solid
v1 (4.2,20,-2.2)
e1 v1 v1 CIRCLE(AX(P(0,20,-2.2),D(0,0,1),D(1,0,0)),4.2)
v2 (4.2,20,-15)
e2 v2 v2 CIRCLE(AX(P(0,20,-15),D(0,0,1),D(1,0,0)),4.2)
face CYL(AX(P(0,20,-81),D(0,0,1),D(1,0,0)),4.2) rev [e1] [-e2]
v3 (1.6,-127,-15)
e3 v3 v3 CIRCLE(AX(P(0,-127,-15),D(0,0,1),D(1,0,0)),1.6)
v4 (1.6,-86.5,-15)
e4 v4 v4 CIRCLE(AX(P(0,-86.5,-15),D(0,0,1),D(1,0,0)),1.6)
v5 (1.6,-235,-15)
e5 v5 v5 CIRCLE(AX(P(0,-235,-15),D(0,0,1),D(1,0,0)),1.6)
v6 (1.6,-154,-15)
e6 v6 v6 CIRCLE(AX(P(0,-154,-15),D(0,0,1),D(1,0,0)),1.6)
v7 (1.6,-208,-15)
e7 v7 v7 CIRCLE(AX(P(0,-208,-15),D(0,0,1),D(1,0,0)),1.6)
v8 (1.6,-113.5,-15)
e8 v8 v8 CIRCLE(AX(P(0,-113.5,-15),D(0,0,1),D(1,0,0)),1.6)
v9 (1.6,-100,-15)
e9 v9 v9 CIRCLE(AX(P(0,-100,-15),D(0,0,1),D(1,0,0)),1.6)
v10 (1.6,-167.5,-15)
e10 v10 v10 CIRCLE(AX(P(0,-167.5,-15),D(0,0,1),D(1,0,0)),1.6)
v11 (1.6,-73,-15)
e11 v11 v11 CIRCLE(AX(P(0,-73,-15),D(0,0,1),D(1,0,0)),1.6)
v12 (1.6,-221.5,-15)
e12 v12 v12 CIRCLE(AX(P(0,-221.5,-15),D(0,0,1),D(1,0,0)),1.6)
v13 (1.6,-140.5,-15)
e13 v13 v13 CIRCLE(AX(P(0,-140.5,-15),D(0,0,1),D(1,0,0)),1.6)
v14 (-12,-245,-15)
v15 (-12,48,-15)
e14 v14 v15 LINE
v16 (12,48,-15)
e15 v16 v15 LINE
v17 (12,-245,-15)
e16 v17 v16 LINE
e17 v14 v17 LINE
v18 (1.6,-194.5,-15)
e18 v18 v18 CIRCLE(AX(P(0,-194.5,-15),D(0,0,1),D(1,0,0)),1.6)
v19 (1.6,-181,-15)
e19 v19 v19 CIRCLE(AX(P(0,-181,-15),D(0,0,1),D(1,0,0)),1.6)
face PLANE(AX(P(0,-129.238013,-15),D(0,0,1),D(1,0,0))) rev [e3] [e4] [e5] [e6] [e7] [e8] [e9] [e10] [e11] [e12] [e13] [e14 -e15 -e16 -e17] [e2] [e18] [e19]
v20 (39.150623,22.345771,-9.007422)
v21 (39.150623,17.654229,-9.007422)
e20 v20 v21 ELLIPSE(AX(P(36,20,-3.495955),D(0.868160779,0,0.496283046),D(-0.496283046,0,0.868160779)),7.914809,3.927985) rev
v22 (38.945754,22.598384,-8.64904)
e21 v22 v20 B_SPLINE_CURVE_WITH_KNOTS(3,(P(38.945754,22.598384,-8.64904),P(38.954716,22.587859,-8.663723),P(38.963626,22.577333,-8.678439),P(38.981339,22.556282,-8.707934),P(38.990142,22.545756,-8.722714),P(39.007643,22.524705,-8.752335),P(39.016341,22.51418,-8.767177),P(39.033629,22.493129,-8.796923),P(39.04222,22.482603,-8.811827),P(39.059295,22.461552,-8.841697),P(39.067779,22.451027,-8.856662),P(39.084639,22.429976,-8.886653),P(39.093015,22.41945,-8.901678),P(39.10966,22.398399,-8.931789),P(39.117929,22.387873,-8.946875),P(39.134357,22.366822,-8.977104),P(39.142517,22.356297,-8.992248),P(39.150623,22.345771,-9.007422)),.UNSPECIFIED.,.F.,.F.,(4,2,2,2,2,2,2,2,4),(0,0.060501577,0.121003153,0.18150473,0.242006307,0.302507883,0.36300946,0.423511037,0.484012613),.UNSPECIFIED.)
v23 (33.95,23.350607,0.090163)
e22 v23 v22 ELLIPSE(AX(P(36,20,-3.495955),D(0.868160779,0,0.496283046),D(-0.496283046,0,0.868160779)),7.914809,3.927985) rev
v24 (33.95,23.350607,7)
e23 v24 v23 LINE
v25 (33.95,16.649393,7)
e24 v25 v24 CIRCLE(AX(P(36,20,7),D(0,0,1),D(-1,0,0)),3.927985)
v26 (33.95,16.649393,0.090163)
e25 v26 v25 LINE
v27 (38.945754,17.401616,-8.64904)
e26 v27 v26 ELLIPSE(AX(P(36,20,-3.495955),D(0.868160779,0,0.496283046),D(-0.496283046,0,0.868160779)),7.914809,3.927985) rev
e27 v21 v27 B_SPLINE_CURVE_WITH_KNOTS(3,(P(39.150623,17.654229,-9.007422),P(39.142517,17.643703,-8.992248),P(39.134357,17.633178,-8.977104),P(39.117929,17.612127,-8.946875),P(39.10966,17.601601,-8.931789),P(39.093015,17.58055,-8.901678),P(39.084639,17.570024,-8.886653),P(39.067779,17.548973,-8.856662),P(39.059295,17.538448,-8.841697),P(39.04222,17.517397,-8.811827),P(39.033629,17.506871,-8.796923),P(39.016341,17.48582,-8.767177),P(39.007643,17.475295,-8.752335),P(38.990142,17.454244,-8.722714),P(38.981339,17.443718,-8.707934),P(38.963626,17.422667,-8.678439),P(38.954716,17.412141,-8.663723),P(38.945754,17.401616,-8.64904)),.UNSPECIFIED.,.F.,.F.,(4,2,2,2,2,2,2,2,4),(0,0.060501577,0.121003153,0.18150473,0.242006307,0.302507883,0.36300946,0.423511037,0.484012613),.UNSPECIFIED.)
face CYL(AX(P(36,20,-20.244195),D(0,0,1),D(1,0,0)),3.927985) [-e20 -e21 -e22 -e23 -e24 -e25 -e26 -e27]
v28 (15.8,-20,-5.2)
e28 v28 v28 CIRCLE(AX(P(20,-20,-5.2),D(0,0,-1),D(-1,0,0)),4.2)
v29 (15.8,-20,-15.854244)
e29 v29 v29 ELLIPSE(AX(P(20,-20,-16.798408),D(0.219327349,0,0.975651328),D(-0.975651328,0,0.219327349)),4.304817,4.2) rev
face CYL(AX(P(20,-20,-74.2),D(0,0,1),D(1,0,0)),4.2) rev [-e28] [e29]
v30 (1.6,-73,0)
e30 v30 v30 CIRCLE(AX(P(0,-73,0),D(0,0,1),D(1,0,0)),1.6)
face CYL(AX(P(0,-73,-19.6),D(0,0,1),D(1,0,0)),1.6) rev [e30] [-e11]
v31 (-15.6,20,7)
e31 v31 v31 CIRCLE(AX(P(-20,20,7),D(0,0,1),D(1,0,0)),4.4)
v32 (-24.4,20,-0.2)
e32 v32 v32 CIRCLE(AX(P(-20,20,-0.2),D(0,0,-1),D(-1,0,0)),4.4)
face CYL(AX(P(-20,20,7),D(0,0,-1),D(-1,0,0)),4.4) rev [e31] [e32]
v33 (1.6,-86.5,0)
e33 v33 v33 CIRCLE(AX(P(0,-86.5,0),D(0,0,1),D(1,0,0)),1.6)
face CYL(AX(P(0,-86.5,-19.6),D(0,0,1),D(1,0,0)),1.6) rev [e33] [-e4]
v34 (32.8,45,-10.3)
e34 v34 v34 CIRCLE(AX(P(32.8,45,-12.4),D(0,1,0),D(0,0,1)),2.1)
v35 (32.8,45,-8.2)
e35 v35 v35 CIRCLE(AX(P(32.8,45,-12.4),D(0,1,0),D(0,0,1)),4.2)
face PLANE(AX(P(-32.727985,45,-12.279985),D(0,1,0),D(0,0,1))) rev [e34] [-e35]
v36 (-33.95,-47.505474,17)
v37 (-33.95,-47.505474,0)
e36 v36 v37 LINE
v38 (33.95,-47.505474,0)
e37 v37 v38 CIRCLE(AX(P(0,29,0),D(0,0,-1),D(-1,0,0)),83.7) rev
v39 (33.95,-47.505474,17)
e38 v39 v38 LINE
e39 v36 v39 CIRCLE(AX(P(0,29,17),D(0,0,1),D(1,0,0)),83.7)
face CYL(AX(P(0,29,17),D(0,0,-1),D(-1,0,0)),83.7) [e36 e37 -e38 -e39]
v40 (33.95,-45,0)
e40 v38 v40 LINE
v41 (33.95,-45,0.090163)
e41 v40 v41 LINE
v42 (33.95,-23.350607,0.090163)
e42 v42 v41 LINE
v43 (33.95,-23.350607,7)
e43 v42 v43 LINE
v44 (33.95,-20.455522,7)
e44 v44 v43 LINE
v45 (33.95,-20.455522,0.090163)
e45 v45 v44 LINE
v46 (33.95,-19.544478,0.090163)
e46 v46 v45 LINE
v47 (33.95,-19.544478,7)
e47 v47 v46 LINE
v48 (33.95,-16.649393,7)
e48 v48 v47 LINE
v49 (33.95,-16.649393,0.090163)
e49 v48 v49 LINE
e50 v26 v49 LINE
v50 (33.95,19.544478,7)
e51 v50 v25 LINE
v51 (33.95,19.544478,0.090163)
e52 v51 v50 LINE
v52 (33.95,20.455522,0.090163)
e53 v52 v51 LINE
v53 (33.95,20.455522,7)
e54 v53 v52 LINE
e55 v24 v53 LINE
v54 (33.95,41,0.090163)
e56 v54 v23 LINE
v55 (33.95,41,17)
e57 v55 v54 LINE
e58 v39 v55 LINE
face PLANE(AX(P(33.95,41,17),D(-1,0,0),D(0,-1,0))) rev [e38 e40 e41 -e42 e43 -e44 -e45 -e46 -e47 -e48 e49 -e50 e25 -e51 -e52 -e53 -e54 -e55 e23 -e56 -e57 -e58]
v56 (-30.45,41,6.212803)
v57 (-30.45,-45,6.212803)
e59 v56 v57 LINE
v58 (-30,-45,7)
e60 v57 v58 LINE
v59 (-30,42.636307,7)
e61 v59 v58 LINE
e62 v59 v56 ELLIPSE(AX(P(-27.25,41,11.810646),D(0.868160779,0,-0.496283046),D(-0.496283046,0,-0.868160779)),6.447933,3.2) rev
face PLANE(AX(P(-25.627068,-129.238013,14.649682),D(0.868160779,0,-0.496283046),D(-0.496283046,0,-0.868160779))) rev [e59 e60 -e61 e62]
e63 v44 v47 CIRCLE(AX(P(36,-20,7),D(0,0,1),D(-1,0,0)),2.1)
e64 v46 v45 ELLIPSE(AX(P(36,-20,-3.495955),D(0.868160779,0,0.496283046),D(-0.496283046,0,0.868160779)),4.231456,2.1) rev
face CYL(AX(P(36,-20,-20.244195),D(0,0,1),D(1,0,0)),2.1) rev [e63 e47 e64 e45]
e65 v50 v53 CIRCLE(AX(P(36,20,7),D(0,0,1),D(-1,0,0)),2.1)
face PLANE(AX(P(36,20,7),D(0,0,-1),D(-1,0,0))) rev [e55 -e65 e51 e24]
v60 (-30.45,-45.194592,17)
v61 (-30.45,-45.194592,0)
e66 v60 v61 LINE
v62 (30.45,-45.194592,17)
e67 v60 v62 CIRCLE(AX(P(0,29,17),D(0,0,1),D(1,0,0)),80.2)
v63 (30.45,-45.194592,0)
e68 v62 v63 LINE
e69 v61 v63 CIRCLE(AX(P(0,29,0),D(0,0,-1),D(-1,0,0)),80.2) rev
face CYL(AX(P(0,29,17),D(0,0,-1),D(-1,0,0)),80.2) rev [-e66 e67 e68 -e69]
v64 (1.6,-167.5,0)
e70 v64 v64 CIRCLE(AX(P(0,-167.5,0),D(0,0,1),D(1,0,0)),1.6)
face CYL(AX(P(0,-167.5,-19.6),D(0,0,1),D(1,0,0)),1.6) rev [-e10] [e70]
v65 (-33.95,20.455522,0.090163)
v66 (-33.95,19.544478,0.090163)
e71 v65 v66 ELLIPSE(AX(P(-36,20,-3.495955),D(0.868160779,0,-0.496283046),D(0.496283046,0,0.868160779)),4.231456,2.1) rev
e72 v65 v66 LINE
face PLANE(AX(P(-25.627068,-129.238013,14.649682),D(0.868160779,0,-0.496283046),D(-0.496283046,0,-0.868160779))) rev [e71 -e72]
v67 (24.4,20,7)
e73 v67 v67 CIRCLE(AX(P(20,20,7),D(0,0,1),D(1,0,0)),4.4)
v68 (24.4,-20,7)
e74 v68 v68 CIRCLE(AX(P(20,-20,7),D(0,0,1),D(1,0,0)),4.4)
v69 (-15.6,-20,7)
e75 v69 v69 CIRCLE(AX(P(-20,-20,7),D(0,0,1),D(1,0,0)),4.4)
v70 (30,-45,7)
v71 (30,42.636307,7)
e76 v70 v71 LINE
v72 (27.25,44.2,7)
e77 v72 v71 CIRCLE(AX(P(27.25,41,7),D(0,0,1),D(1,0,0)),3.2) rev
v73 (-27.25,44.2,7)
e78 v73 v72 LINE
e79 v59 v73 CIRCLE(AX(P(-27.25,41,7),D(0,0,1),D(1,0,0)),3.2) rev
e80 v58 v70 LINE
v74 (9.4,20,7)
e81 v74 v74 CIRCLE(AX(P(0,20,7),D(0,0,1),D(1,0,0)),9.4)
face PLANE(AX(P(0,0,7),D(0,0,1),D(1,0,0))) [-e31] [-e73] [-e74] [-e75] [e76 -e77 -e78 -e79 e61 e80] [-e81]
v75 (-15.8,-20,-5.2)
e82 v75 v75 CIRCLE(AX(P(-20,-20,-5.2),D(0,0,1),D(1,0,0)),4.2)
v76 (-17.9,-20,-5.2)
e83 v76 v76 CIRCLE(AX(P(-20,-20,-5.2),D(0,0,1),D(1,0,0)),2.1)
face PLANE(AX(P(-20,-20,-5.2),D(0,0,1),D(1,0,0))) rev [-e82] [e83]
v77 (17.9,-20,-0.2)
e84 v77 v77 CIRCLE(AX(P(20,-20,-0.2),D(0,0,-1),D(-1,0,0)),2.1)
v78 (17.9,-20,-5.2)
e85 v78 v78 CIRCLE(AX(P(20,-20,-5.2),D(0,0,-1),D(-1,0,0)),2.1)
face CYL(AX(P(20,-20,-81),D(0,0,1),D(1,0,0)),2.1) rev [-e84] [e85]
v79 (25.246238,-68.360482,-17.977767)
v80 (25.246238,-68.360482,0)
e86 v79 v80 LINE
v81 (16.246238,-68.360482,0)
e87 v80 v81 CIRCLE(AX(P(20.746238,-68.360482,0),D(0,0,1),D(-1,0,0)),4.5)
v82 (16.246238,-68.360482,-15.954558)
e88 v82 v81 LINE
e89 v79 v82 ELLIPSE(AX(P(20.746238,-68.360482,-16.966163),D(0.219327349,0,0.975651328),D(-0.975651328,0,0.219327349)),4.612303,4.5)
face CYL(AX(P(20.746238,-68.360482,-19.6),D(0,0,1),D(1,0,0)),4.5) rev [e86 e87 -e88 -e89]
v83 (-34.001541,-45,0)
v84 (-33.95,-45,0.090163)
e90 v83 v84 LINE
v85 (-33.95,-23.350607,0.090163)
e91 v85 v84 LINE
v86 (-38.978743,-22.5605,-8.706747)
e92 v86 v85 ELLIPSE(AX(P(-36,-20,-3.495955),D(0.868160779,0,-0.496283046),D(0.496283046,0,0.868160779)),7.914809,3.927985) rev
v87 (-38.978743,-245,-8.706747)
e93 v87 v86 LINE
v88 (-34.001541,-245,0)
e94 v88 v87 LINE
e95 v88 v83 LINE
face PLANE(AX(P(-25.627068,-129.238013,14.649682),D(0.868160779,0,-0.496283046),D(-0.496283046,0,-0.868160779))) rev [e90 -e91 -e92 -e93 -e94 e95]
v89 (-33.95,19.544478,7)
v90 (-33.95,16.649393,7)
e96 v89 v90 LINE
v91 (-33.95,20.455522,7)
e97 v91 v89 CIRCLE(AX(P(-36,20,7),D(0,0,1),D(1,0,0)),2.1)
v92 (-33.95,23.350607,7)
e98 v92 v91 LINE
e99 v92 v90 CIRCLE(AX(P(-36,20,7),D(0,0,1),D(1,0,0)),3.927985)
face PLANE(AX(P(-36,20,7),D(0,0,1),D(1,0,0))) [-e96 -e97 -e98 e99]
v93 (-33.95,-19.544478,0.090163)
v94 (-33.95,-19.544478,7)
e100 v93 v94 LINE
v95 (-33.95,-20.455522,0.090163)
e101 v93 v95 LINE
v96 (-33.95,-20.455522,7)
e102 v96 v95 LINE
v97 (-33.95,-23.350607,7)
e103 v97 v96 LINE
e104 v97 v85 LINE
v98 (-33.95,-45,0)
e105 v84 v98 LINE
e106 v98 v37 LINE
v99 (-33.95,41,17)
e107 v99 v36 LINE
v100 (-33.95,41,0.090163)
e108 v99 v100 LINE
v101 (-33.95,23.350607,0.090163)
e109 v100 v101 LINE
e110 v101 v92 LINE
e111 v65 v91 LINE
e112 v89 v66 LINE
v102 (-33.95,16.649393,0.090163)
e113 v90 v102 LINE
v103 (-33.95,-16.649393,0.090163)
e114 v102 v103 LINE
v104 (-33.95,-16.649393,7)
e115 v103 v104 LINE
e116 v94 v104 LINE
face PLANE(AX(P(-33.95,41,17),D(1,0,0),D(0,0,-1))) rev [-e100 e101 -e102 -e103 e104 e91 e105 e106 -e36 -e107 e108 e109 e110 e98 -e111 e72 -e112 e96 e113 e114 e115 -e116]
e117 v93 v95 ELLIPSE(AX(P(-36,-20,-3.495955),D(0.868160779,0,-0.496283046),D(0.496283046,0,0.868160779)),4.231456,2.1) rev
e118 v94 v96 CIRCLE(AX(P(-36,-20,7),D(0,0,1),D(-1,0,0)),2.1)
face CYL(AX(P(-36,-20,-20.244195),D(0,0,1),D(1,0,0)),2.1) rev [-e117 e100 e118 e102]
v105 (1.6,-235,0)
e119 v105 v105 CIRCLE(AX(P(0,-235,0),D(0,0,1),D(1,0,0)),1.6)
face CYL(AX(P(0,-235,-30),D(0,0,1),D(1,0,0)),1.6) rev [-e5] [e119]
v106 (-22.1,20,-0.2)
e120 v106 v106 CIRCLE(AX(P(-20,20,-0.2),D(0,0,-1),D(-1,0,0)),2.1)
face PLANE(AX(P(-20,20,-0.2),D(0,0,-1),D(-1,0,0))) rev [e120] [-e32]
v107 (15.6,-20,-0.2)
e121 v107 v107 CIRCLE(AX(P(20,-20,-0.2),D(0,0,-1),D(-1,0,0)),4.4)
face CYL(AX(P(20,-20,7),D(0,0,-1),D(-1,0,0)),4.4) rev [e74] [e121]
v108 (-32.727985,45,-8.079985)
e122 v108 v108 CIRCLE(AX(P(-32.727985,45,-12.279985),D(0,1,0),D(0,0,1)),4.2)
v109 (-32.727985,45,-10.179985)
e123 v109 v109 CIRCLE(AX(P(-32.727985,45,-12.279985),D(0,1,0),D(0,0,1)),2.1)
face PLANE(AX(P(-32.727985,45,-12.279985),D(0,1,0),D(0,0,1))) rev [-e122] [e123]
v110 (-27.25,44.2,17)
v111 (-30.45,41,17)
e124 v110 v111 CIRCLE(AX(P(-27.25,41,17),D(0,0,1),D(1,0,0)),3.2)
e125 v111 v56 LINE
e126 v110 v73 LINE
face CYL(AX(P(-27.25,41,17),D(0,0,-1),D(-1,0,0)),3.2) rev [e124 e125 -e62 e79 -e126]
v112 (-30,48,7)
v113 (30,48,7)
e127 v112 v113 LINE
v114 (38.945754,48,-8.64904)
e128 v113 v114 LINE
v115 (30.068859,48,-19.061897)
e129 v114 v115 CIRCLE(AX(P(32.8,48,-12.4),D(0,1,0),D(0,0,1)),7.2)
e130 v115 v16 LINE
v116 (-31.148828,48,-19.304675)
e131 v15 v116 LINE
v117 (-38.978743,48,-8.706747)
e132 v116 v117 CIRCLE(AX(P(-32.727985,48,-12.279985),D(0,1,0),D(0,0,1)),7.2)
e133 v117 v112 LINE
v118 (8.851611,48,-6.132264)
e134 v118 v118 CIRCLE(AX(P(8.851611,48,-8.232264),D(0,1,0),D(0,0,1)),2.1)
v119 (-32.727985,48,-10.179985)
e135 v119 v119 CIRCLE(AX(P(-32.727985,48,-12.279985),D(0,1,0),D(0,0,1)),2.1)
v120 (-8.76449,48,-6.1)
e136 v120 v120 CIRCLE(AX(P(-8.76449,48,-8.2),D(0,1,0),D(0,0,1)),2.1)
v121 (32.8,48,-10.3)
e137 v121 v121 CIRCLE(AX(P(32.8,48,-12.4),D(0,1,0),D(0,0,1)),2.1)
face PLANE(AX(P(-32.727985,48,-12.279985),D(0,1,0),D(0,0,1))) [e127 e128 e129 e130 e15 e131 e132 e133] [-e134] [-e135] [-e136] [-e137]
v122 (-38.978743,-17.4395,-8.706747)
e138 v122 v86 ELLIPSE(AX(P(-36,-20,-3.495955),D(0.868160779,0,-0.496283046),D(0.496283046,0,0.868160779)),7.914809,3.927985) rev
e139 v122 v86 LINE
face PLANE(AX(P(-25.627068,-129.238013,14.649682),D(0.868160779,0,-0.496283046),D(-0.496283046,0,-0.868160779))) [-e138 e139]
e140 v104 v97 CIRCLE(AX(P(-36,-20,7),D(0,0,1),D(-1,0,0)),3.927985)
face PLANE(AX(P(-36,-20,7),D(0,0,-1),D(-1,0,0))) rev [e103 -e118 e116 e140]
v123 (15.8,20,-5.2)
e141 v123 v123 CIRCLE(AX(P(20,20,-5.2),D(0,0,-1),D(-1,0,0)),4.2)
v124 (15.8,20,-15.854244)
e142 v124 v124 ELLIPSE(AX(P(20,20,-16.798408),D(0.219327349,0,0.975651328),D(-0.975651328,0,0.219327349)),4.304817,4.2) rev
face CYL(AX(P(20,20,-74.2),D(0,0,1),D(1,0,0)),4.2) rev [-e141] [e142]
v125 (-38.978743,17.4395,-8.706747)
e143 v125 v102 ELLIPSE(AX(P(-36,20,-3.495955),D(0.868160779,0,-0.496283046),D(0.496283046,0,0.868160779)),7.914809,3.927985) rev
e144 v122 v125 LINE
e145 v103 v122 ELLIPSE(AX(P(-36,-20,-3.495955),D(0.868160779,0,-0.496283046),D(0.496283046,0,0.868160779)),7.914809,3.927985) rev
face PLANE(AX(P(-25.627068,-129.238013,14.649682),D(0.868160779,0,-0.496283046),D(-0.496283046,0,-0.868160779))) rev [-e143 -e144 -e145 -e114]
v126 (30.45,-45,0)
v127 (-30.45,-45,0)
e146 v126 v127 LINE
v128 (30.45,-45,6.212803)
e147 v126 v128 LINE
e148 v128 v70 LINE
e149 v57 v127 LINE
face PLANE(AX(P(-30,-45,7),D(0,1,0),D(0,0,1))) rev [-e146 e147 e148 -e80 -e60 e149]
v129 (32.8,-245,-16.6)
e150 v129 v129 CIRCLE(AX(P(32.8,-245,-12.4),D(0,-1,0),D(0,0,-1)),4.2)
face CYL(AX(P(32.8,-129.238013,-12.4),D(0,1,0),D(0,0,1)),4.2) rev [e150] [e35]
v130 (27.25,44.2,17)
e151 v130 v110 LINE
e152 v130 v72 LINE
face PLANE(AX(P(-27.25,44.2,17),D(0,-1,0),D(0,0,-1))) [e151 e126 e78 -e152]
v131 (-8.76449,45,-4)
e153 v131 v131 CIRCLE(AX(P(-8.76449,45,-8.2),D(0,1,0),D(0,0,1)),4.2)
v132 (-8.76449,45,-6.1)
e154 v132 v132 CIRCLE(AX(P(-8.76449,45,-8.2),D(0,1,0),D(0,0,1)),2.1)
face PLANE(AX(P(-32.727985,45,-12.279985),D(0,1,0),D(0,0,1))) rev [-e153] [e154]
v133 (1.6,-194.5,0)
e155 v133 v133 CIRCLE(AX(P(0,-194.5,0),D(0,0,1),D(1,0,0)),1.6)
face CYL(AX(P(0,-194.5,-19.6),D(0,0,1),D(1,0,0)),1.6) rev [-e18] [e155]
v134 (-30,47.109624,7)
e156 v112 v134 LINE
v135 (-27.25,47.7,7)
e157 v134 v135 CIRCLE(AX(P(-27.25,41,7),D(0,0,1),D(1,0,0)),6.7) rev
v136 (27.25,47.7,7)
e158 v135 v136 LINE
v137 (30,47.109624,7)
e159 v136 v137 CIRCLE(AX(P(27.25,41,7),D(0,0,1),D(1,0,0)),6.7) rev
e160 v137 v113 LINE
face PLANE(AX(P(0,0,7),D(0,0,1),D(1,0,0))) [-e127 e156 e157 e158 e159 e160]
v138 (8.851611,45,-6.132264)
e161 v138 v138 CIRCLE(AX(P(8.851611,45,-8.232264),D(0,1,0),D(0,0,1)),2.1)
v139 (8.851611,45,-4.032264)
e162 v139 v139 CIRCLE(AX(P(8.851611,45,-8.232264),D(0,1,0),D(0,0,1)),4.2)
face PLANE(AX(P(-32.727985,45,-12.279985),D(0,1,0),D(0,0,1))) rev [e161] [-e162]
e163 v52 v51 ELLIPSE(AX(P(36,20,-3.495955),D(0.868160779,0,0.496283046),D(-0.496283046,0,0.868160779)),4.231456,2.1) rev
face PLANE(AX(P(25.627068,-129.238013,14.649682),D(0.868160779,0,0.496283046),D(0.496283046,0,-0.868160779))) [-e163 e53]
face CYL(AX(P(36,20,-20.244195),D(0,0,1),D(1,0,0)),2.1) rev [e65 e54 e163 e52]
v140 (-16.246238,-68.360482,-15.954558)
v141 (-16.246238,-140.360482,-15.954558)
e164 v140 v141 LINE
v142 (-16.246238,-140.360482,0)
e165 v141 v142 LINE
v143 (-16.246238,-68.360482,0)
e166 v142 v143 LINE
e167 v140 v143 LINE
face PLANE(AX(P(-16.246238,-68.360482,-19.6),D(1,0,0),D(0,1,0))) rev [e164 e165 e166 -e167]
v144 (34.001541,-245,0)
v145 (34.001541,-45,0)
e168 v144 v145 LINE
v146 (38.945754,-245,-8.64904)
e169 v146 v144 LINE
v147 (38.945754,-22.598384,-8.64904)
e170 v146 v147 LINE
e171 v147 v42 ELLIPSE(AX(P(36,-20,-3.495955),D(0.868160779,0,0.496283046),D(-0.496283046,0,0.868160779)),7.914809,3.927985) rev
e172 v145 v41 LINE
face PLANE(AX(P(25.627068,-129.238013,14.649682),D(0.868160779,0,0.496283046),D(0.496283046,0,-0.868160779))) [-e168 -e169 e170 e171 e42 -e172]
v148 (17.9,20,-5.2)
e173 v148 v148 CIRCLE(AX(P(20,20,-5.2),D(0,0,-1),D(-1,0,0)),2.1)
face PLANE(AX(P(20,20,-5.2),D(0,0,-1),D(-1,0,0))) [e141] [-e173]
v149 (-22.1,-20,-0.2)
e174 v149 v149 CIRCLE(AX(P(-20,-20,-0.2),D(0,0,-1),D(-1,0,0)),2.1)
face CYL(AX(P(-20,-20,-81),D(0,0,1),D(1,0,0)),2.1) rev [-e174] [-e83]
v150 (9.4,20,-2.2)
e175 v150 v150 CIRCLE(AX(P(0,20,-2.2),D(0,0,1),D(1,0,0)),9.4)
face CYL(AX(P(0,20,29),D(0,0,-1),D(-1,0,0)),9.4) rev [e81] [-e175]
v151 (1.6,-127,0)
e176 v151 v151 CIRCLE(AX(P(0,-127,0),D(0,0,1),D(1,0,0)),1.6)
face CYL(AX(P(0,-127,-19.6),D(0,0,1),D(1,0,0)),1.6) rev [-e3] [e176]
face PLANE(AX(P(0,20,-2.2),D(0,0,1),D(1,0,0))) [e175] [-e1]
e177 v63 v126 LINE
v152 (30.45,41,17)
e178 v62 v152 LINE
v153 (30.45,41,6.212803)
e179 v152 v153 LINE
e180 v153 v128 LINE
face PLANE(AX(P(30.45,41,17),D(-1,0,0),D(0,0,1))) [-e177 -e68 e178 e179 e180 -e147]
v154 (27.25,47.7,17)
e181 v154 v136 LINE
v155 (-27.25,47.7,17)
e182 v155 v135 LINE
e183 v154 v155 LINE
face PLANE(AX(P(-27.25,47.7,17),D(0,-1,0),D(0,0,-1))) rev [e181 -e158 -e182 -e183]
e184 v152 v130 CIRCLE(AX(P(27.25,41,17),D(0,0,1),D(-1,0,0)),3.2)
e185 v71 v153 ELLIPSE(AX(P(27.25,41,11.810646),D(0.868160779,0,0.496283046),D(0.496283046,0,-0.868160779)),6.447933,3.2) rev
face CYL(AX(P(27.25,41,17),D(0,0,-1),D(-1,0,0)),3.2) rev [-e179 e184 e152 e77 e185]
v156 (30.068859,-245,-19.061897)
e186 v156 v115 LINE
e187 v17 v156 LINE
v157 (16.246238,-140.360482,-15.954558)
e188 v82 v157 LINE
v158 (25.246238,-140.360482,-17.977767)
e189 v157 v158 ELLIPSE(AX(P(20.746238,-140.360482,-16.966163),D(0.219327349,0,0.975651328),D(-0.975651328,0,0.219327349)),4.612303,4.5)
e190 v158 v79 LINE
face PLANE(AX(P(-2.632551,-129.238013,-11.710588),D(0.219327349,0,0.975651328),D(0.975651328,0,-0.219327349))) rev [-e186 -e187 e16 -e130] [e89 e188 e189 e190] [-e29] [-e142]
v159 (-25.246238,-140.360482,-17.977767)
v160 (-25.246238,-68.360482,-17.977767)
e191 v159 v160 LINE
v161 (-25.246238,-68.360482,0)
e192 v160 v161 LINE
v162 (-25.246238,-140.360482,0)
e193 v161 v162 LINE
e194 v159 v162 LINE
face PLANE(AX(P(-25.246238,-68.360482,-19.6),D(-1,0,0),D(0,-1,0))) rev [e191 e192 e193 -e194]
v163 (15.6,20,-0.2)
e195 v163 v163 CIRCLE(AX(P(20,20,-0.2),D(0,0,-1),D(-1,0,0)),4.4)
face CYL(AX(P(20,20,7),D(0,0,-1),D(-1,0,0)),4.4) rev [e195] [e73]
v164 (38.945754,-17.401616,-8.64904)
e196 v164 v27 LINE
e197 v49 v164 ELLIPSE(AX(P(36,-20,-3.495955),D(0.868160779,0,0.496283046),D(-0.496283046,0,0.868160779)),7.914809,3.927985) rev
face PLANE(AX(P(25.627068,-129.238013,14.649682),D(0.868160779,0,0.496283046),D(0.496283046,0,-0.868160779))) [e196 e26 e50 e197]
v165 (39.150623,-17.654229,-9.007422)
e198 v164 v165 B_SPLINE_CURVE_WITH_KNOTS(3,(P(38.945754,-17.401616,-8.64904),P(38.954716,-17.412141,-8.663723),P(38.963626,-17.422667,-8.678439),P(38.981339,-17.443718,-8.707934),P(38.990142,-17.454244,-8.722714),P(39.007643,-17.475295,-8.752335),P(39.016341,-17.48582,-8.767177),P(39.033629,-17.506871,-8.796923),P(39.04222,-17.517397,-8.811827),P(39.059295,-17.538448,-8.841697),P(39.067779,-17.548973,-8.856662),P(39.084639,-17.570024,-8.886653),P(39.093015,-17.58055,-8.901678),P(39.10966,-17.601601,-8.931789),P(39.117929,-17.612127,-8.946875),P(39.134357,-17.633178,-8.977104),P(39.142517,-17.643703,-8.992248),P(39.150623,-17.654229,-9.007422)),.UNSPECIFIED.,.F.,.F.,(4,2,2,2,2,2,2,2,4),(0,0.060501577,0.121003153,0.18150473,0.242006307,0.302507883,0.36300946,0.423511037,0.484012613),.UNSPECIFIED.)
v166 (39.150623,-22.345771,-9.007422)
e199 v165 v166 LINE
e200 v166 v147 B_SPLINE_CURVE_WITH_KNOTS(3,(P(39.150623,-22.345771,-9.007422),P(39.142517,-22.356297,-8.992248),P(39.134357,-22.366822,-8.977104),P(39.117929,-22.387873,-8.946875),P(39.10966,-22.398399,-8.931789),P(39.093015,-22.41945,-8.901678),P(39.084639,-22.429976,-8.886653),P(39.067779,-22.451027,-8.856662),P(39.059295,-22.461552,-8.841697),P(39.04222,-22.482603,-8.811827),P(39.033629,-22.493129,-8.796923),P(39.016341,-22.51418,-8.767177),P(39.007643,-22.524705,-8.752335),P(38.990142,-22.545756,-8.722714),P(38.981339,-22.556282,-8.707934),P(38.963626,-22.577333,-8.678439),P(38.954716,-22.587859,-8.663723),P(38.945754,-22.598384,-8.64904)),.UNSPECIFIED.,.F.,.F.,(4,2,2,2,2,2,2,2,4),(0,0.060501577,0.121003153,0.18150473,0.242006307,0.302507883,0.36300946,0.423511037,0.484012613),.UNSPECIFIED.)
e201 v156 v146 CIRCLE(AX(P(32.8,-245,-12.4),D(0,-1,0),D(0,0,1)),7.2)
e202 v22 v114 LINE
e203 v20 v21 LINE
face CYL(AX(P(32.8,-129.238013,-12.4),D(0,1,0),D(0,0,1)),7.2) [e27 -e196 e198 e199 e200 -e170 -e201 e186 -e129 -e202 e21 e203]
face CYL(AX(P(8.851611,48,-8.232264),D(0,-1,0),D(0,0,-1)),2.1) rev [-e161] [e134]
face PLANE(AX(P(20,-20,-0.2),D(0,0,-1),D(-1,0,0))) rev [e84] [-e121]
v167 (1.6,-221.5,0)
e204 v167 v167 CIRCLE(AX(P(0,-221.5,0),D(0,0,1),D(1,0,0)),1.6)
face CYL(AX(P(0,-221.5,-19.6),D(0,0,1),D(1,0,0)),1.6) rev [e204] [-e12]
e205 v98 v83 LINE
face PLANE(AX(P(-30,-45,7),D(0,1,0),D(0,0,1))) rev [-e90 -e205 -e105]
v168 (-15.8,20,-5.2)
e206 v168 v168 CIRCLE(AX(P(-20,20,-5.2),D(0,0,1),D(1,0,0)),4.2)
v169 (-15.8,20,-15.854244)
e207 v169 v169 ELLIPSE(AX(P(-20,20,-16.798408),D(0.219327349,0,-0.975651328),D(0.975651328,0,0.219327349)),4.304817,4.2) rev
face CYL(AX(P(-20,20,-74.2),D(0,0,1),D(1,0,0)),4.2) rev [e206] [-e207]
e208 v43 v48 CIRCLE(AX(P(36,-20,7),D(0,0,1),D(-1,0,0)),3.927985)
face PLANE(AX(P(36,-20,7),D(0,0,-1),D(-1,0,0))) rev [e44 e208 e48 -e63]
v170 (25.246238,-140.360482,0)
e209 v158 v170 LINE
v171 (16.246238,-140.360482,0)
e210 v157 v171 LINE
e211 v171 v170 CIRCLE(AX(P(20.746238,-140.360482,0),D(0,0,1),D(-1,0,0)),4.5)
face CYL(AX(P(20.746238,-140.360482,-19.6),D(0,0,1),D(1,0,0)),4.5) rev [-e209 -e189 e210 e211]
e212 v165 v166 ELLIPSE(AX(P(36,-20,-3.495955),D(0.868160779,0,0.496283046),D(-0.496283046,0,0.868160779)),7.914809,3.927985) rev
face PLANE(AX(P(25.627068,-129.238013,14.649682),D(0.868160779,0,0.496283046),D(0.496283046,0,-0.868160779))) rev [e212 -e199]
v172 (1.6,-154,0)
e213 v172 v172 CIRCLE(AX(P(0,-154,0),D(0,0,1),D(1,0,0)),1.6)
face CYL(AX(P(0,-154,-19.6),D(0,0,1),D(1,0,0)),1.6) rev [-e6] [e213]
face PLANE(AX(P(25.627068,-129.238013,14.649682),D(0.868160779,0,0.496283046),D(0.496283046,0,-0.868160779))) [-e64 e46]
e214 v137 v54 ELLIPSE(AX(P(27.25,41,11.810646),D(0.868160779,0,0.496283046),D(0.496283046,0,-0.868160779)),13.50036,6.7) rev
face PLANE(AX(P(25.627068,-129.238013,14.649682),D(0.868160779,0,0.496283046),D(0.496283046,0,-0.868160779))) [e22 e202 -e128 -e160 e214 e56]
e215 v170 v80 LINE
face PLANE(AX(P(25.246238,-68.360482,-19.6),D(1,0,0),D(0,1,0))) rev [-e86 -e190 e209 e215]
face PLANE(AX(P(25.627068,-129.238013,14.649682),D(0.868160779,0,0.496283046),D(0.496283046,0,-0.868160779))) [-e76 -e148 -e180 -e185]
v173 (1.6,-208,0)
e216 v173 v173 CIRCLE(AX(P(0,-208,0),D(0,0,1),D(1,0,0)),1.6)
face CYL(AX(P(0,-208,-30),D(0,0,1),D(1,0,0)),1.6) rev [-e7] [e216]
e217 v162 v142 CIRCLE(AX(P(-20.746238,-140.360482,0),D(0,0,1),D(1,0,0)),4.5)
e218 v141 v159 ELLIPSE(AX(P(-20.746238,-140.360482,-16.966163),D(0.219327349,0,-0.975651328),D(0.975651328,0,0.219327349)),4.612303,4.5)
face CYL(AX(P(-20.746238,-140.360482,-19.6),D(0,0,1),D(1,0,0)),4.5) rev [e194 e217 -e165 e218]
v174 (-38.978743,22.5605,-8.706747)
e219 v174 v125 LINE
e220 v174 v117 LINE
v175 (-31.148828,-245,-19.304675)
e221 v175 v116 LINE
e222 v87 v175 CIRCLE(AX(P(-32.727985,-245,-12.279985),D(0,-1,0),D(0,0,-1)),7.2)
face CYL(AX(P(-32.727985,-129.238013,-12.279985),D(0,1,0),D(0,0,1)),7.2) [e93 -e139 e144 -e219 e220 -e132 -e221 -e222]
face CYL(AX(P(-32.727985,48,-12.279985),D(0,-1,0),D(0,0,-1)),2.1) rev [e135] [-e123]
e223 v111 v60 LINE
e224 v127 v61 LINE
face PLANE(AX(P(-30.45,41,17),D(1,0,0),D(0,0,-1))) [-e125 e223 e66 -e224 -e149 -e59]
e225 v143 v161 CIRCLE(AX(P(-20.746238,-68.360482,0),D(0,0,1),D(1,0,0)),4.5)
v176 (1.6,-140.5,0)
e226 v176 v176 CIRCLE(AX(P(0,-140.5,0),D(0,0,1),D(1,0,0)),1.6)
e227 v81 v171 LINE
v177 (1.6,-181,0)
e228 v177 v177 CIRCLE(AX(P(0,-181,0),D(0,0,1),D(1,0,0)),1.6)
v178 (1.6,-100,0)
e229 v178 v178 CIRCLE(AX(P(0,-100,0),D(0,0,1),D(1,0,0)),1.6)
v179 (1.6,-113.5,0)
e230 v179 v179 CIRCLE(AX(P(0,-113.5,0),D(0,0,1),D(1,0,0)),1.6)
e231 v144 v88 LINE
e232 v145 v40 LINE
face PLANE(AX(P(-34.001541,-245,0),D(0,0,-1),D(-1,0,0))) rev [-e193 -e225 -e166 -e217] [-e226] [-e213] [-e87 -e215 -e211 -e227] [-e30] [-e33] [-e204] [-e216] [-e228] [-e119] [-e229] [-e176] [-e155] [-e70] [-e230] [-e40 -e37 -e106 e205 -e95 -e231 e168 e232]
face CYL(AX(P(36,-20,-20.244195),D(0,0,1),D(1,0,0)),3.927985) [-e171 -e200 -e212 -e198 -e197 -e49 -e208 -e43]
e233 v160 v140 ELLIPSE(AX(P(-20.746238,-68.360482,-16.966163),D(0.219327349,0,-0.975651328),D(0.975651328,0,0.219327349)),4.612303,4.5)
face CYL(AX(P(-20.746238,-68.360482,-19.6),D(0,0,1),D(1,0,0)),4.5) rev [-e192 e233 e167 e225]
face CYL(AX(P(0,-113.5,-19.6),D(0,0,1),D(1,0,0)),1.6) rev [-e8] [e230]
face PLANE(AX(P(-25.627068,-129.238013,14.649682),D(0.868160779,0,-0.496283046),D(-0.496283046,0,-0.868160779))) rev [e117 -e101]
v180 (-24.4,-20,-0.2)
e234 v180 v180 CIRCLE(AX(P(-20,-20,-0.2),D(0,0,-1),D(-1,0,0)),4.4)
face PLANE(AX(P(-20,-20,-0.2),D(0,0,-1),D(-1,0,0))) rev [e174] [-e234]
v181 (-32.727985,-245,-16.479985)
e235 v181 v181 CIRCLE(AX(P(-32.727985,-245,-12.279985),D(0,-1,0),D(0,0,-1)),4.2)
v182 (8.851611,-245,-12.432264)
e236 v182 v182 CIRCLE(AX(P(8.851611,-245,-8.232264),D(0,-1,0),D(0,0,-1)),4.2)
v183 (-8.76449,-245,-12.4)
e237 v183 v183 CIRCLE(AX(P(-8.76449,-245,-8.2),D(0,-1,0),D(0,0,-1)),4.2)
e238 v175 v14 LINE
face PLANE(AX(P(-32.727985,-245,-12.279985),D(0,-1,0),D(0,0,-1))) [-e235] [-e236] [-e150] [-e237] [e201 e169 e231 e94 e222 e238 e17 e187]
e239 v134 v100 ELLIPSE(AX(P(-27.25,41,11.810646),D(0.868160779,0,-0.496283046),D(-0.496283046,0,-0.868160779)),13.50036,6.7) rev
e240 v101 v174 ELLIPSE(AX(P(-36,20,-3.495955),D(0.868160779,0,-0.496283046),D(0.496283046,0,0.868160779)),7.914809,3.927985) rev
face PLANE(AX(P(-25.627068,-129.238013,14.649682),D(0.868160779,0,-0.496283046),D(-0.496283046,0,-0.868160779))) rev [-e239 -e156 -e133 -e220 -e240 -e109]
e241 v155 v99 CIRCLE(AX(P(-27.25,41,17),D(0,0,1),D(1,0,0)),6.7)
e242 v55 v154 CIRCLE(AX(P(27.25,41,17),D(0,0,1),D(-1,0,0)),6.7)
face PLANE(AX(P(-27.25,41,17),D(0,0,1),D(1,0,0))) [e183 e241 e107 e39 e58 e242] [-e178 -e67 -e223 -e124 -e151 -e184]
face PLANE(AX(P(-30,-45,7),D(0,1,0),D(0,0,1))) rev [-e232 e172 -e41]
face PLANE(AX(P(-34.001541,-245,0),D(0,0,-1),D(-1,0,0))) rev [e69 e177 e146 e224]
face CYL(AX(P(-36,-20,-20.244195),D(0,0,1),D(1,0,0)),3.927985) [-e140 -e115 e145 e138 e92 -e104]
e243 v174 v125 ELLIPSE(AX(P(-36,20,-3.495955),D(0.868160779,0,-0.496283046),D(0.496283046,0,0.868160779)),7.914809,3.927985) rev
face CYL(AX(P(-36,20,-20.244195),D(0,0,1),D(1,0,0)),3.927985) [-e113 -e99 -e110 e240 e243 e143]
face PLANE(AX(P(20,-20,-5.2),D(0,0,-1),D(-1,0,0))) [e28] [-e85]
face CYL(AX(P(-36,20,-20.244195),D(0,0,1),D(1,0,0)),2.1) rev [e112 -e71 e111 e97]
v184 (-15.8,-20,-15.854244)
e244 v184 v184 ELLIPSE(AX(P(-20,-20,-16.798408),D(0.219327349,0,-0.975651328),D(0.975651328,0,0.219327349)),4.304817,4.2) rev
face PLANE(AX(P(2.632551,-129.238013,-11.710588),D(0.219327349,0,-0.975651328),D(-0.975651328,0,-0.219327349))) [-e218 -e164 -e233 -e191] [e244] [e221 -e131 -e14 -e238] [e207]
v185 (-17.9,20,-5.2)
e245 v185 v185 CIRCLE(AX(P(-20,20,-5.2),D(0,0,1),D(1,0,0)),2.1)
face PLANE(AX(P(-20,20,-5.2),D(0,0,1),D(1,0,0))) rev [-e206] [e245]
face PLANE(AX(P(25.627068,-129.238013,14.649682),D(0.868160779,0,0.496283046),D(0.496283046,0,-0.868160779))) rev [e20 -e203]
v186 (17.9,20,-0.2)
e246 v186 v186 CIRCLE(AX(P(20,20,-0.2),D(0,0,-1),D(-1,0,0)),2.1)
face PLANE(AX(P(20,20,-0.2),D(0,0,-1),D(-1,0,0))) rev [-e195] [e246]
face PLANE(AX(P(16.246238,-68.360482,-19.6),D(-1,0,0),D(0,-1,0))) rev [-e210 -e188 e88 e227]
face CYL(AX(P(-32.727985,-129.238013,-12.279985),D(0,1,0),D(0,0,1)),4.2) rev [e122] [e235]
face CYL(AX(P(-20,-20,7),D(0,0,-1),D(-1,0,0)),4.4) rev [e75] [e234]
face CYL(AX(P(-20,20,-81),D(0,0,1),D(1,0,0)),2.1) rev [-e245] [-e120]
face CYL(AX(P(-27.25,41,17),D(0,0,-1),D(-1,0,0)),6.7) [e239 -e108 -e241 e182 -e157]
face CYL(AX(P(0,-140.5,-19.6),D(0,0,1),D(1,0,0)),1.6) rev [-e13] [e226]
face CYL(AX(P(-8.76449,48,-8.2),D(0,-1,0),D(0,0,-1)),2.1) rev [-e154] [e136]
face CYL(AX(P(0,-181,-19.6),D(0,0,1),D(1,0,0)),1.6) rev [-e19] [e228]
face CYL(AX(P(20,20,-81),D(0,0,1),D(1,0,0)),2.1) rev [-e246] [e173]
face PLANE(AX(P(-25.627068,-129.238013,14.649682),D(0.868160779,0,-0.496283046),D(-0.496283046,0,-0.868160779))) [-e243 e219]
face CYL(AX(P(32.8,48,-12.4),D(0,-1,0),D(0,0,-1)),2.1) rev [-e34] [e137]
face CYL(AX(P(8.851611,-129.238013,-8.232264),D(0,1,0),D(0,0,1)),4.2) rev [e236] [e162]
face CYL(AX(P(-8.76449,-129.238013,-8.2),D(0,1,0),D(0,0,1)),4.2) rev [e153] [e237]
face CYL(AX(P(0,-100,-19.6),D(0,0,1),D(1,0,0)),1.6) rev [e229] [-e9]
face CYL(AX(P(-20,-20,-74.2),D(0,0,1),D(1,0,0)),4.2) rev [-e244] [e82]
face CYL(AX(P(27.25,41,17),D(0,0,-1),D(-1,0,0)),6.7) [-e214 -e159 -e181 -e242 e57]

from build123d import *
from build123d.topology import SkipClean

# Parameters (mm, degrees)
SKETCH_2_W             = 60
SKETCH_2_H             = 90
SKETCH_2_R             = 4.4
EXTRUDE_1_DEPTH        = 7
SKETCH_3_R             = 9.4
CUT_EXTRUDE_1_DEPTH    = 29
EXTRUDE_START          = 0.2
SKETCH_5_W             = 60
SKETCH_5_H             = 90
SKETCH_5_R             = 9.4
SKETCH_5_R_2           = 4.4
EXTRUDE_2_DEPTH        = 0.2
SKETCH_6_R             = 6.4
SKETCH_6_R_2           = 2.2
EXTRUDE_3_DEPTH        = 5
SKETCH_8_R             = 10.4
SKETCH_8_R_2           = 9.4
EXTRUDE_4_DEPTH        = 2
SKETCH_9_R             = 6.2
SKETCH_9_R_2           = 4.2
EXTRUDE_6_DEPTH        = 87
EXTRUDE_6_2_DEPTH      = 87
EXTRUDE_6_3_DEPTH      = 87
EXTRUDE_6_4_DEPTH      = 87
EXTRUDE_START_2        = -90
EXTRUDE_11_OUTLINE_R   = 4.2
EXTRUDE_11_DEPTH       = 90
SKETCH_10_R            = 4.2
CUT_EXTRUDE_2_DEPTH    = 74
CUT_EXTRUDE_START      = -9.2
SKETCH_12_R            = 9.4
CUT_EXTRUDE_3_DEPTH    = 9.2
SKETCH_13_R            = 5.394379646
SKETCH_13_R_2          = 5.554961838
EXTRUDE_13_DEPTH       = 5
SKETCH_14_R            = 2.1
SKETCH_14_R_2          = 4.2
CUT_EXTRUDE_4_DEPTH    = 88
SKETCH_15_R            = 2.1
EXTRUDE_16_DEPTH       = 3
EXTRUDE_START_3        = 200
SKETCH_16_R            = 4.2
EXTRUDE_17_DEPTH       = 200
EXTRUDE_19_DEPTH       = 10
SKETCH_26_R            = 1.6
CUT_EXTRUDE_5_DEPTH    = 30
SKETCH_28_R            = 1.6
CUT_EXTRUDE_6_DEPTH    = 250.016385003
PATTERN_LINEAR_1_COUNT = 10
PATTERN_LINEAR_1_PITCH = 13.5
CUT_EXTRUDE_7_DEPTH    = 250.016385003
SKETCH_33_R            = 1.6
CUT_EXTRUDE_8_DEPTH    = 250.016385003
EXTRUDE_20_REACH       = 251.665
SKETCH_34_R            = 3.927985286
SKETCH_34_R_2          = 2.1
EXTRUDE_21_REACH       = 251.665
SKETCH_36_R            = 3.927985286
SKETCH_36_R_2          = 2.1


# Read off the part's stored shape, not the designer's step: 凸台-拉伸11
with BuildPart() as part:
    # 草图2 → 凸台-拉伸1 (new body)
    with BuildSketch(Plane.XY):
        Rectangle(SKETCH_2_W, SKETCH_2_H)
        with Locations((20, 20)):
            Circle(SKETCH_2_R, mode=Mode.SUBTRACT)
        with Locations((-20, 20)):
            Circle(SKETCH_2_R, mode=Mode.SUBTRACT)
        with Locations((-20, -20)):
            Circle(SKETCH_2_R, mode=Mode.SUBTRACT)
        with Locations((20, -20)):
            Circle(SKETCH_2_R, mode=Mode.SUBTRACT)
    extrude(amount=EXTRUDE_1_DEPTH)

    # 草图3 → 切除-拉伸1 (cut)
    with BuildSketch(Plane(origin=(0, 0, 0), x_dir=(-1, 0, 0), z_dir=(0, 0, -1))):
        with Locations((0, 20)):
            Circle(SKETCH_3_R)
    extrude(amount=-CUT_EXTRUDE_1_DEPTH, mode=Mode.SUBTRACT)

    # 草图5 → 凸台-拉伸2 (add)
    with SkipClean():  # the faces are left unmerged after this step: merging them gives an invalid solid
        with BuildSketch(Plane(origin=(0, 0, 0), x_dir=(-1, 0, 0), z_dir=(0, 0, -1)).offset(EXTRUDE_START)):
            Rectangle(SKETCH_5_W, SKETCH_5_H)
            with Locations((0, 20)):
                Circle(SKETCH_5_R, mode=Mode.SUBTRACT)
            with Locations((-20, 20)):
                Circle(SKETCH_5_R_2, mode=Mode.SUBTRACT)
            with Locations((20, 20)):
                Circle(SKETCH_5_R_2, mode=Mode.SUBTRACT)
            with Locations((-20, -20)):
                Circle(SKETCH_5_R_2, mode=Mode.SUBTRACT)
            with Locations((20, -20)):
                Circle(SKETCH_5_R_2, mode=Mode.SUBTRACT)
        extrude(amount=-EXTRUDE_2_DEPTH)

    # 草图6 → 凸台-拉伸3 (add)
    # profile 1 of 4: a face of its own
    with SkipClean():  # the faces are left unmerged after this step: merging them gives an invalid solid
        with BuildSketch(Plane(origin=(0, 0, -0.2), x_dir=(-1, 0, 0), z_dir=(0, 0, -1))):
            with Locations((-20, 20)):
                Circle(SKETCH_6_R)
            with Locations((-20, 20)):
                Circle(SKETCH_6_R_2, mode=Mode.SUBTRACT)
        # profile 2 of 4: a face of its own
        with BuildSketch(Plane(origin=(0, 0, -0.2), x_dir=(-1, 0, 0), z_dir=(0, 0, -1))):
            with Locations((20, 20)):
                Circle(SKETCH_6_R)
            with Locations((20, 20)):
                Circle(SKETCH_6_R_2, mode=Mode.SUBTRACT)
        # profile 3 of 4: a face of its own
        with BuildSketch(Plane(origin=(0, 0, -0.2), x_dir=(-1, 0, 0), z_dir=(0, 0, -1))):
            with Locations((-20, -20)):
                Circle(SKETCH_6_R)
            with Locations((-20, -20)):
                Circle(SKETCH_6_R_2, mode=Mode.SUBTRACT)
        # profile 4 of 4: a face of its own
        with BuildSketch(Plane(origin=(0, 0, -0.2), x_dir=(-1, 0, 0), z_dir=(0, 0, -1))):
            with Locations((20, -20)):
                Circle(SKETCH_6_R)
            with Locations((20, -20)):
                Circle(SKETCH_6_R_2, mode=Mode.SUBTRACT)
        extrude(amount=EXTRUDE_3_DEPTH)

    # 草图8 → 凸台-拉伸4 (add)
    with SkipClean():  # the faces are left unmerged after this step: merging them gives an invalid solid
        with BuildSketch(Plane(origin=(0, 0, -0.2), x_dir=(-1, 0, 0), z_dir=(0, 0, -1))):
            with Locations((-0.054578781, 20.238018036)):
                Circle(SKETCH_8_R)
            with Locations(Location((-0.054578781, 20.238018036, 0), (0, 0, 193.659194288))):
                Circle(SKETCH_8_R_2, mode=Mode.SUBTRACT)
        extrude(amount=EXTRUDE_4_DEPTH)



with BuildPart() as body_2:
    # 草图9 → 凸台-拉伸6 (new body)
    with BuildSketch(Plane.XZ.offset(45)):
        with Locations(Location((32.8, -12.4, 0), (0, 0, 270))):
            Circle(SKETCH_9_R)
        with Locations(Location((32.8, -12.4, 0), (0, 0, 270))):
            Circle(SKETCH_9_R_2, mode=Mode.SUBTRACT)
    extrude(amount=-EXTRUDE_6_DEPTH)


with BuildPart() as body_3:
    # 草图9 → Extrude 6 2 (new body)
    with BuildSketch(Plane.XZ.offset(45)):
        with Locations(Location((-32.727985286, -12.279985317, 0), (0, 0, 90))):
            Circle(SKETCH_9_R)
        with Locations(Location((-32.727985286, -12.279985317, 0), (0, 0, 90))):
            Circle(SKETCH_9_R_2, mode=Mode.SUBTRACT)
    extrude(amount=-EXTRUDE_6_2_DEPTH)


with BuildPart() as body_4:
    # 草图9 → Extrude 6 3 (new body)
    with BuildSketch(Plane.XZ.offset(45)):
        with BuildLine():
            Line((8.866995315, -4.032292114), (10.646326686, -3.444094386))
            Line((10.646326686, -3.444094386), (12.412827061, -4.710086322))
            Line((12.412827061, -4.710086322), (13.914352381, -7.919228671))
            Line((13.914352381, -7.919228671), (13.354960595, -12.432263937))
            Line((13.354960595, -12.432263937), (12.736803026, -14.246535718))
            Line((12.736803026, -14.246535718), (8.829632785, -14.232223684))
            Line((8.829632785, -14.232223684), (8.836226172, -12.43223576))
            ThreePointArc((8.836226172, -12.43223576), (13.051582567, -8.247648508), (8.866995315, -4.032292114))
        make_face()
    extrude(amount=-EXTRUDE_6_3_DEPTH)


with BuildPart() as body_5:
    # 草图9 → Extrude 6 4 (new body)
    with BuildSketch(Plane.XZ.offset(45)):
        with BuildLine():
            Line((-8.764490306, -4), (-10.541655175, -3.405288539))
            Line((-10.541655175, -3.405288539), (-12.312781019, -4.664801303))
            Line((-12.312781019, -4.664801303), (-13.826051332, -7.868422046))
            Line((-13.826051332, -7.868422046), (-13.283194516, -12.383476083))
            Line((-13.283194516, -12.383476083), (-12.671686759, -14.2))
            Line((-12.671686759, -14.2), (-8.764490306, -14.2))
            Line((-8.764490306, -14.2), (-8.764490306, -12.4))
            ThreePointArc((-8.764490306, -12.4), (-12.964490306, -8.2), (-8.764490306, -4))
        make_face()
    extrude(amount=-EXTRUDE_6_4_DEPTH)


with BuildPart() as part_1:
    with SkipClean():  # the faces are left unmerged after this step: merging them gives an invalid solid
        add(part.part)

        add(body_2.part)  # 凸台-拉伸11 merges body 2

        add(body_3.part)  # 凸台-拉伸11 merges body 3

        add(body_4.part)  # 凸台-拉伸11 merges body 4

        add(body_5.part)  # 凸台-拉伸11 merges body 5
        # 凸台-拉伸11 outline → 凸台-拉伸11 (add)
        with BuildSketch(Plane(origin=(0, 45, 0), x_dir=(1, 0, 0), z_dir=(0, 1, 0)).offset(EXTRUDE_START_2)):
            with BuildLine():
                Line((12, 15), (-12, 15))
                Line((-12, 15), (-31.148828374, 19.304674879))
                ThreePointArc((-31.148828374, 19.304674879), (-38.518924765, 16.558421942), (-38.978742897, 8.706747388))
                Line((-38.978742897, 8.706747388), (-30, -7))
                Line((-30, -7), (-30, 0.2))
                Line((-30, 0.2), (30, 0.2))
                Line((30, 0.2), (30, -7))
                Line((30, -7), (38.945754269, 8.649039527))
                ThreePointArc((38.945754269, 8.649039527), (38.279214713, 17.070996267), (30.068858697, 19.061896666))
                Line((30.068858697, 19.061896666), (12, 15))
            make_face()
            with Locations((-8.764490306, 8.2)):
                Circle(EXTRUDE_11_OUTLINE_R, mode=Mode.SUBTRACT)
            with Locations((8.851610744, 8.232263937)):
                Circle(EXTRUDE_11_OUTLINE_R, mode=Mode.SUBTRACT)
            with Locations((-32.727985286, 12.279985317)):
                Circle(EXTRUDE_11_OUTLINE_R, mode=Mode.SUBTRACT)
            with Locations((32.8, 12.4)):
                Circle(EXTRUDE_11_OUTLINE_R, mode=Mode.SUBTRACT)
        extrude(amount=EXTRUDE_11_DEPTH)

    # 草图10 → 切除-拉伸2 (cut)
    with SkipClean():  # the faces are left unmerged after this step: merging them gives an invalid solid
        with BuildSketch(Plane(origin=(0, 0, -0.2), x_dir=(-1, 0, 0), z_dir=(0, 0, -1))):
            with Locations((-20, 20)):
                Circle(SKETCH_10_R)
            with Locations(Location((20, 20, 0), (0, 0, 180))):
                Circle(SKETCH_10_R)
            with Locations(Location((20, -20, 0), (0, 0, 180))):
                Circle(SKETCH_10_R)
            with Locations(Location((-20, -20, 0), (0, 0, 180))):
                Circle(SKETCH_10_R)
        extrude(amount=CUT_EXTRUDE_2_DEPTH, mode=Mode.SUBTRACT)

    # 草图12 → 切除-拉伸3 (cut)
    with SkipClean():  # the faces are left unmerged after this step: merging them gives an invalid solid
        with BuildSketch(Plane.XY.offset(7).offset(CUT_EXTRUDE_START)):
            with Locations((0, 20)):
                Circle(SKETCH_12_R)
        extrude(amount=CUT_EXTRUDE_3_DEPTH, mode=Mode.SUBTRACT)

    # 草图13 → 凸台-拉伸13 (add)
    with SkipClean():  # the faces are left unmerged after this step: merging them gives an invalid solid
        with BuildSketch(Plane.XY.offset(-0.2)):
            with Locations((-20, 20)):
                Circle(SKETCH_13_R)
            with Locations((-20, -20)):
                Circle(SKETCH_13_R_2)
            with Locations((20, -20)):
                Circle(SKETCH_13_R_2)
            with Locations((20, 20)):
                Circle(SKETCH_13_R)
        extrude(amount=-EXTRUDE_13_DEPTH)

    # 草图14 → 切除-拉伸4 (cut)
    with SkipClean():  # the faces are left unmerged after this step: merging them gives an invalid solid
        with BuildSketch(Plane.XY.offset(7)):
            with Locations((-20, 20)):
                Circle(SKETCH_14_R)
            with Locations(Location((20, 20, 0), (0, 0, 180))):
                Circle(SKETCH_14_R)
            with Locations(Location((20, -20, 0), (0, 0, 180))):
                Circle(SKETCH_14_R)
            with Locations((-20, -20)):
                Circle(SKETCH_14_R)
            with Locations((0, 20)):
                Circle(SKETCH_14_R_2)
        extrude(amount=-CUT_EXTRUDE_4_DEPTH, mode=Mode.SUBTRACT)

    # 草图15 → 凸台-拉伸16 (add)
    with SkipClean():  # the faces are left unmerged after this step: merging them gives an invalid solid
        with BuildSketch(Plane(origin=(0, 45, 0), x_dir=(1, 0, 0), z_dir=(0, 1, 0))):
            with BuildLine():
                Line((30.068858697, 19.061896666), (12, 15))
                Line((12, 15), (-12, 15))
                Line((-12, 15), (-31.148828374, 19.304674879))
                ThreePointArc((-31.148828374, 19.304674879), (-38.518924765, 16.558421942), (-38.978742897, 8.706747388))
                Line((-38.978742897, 8.706747388), (-30, -7))
                Line((-30, -7), (30, -7))
                Line((30, -7), (38.945754269, 8.649039527))
                ThreePointArc((38.945754269, 8.649039527), (38.279214713, 17.070996267), (30.068858697, 19.061896666))
            make_face()
            with Locations(Location((-32.727985286, 12.279985317, 0), (0, 0, 270))):
                Circle(SKETCH_15_R, mode=Mode.SUBTRACT)
            with Locations(Location((-8.764490306, 8.2, 0), (0, 0, 270))):
                Circle(SKETCH_15_R, mode=Mode.SUBTRACT)
            with Locations(Location((8.851610744, 8.232263937, 0), (0, 0, 270))):
                Circle(SKETCH_15_R, mode=Mode.SUBTRACT)
            with Locations(Location((32.8, 12.4, 0), (0, 0, 270))):
                Circle(SKETCH_15_R, mode=Mode.SUBTRACT)
        extrude(amount=EXTRUDE_16_DEPTH)

    # 草图16 → 凸台-拉伸17 (add)
    with SkipClean():  # the faces are left unmerged after this step: merging them gives an invalid solid
        with BuildSketch(Plane.XZ.offset(45).offset(EXTRUDE_START_3)):
            with BuildLine():
                Line((-34.001541422, 0), (34.001541422, 0))
                Line((34.001541422, 0), (38.945754269, -8.649039527))
                ThreePointArc((38.945754269, -8.649039527), (38.279214713, -17.070996267), (30.068858697, -19.061896666))
                Line((30.068858697, -19.061896666), (12, -15))
                Line((12, -15), (-12, -15))
                Line((-12, -15), (-31.148828374, -19.304674879))
                ThreePointArc((-31.148828374, -19.304674879), (-38.518924765, -16.558421942), (-38.978742897, -8.706747388))
                Line((-38.978742897, -8.706747388), (-34.001541422, 0))
            make_face()
            with Locations(Location((-32.727985286, -12.279985317, 0), (0, 0, 90))):
                Circle(SKETCH_16_R, mode=Mode.SUBTRACT)
            with Locations(Location((-8.764490306, -8.2, 0), (0, 0, 90))):
                Circle(SKETCH_16_R, mode=Mode.SUBTRACT)
            with Locations(Location((8.851610744, -8.232263937, 0), (0, 0, 90))):
                Circle(SKETCH_16_R, mode=Mode.SUBTRACT)
            with Locations(Location((32.8, -12.4, 0), (0, 0, 90))):
                Circle(SKETCH_16_R, mode=Mode.SUBTRACT)
        extrude(amount=-EXTRUDE_17_DEPTH)

    # 草图24 → 凸台-拉伸19 (add, symmetric)
    with SkipClean():  # the faces are left unmerged after this step: merging them gives an invalid solid
        with BuildSketch(Plane.XY.offset(7)):
            with BuildLine():
                Line((-27.25, 47.7), (27.25, 47.7))
                ThreePointArc((27.25, 47.7), (31.987615434, 45.737615434), (33.95, 41))
                Line((33.95, 41), (33.95, -47.50547366))
                ThreePointArc((33.95, -47.50547366), (0, -54.7), (-33.95, -47.50547366))
                Line((-33.95, -47.50547366), (-33.95, 41))
                ThreePointArc((-33.95, 41), (-31.987615434, 45.737615434), (-27.25, 47.7))
            make_face()
            with BuildLine():
                Line((-27.25, 44.2), (27.25, 44.2))
                ThreePointArc((27.25, 44.2), (29.5127417, 43.2627417), (30.45, 41))
                Line((30.45, 41), (30.45, -45.194592121))
                ThreePointArc((30.45, -45.194592121), (0, -51.2), (-30.45, -45.194592121))
                Line((-30.45, -45.194592121), (-30.45, 41))
                ThreePointArc((-30.45, 41), (-29.5127417, 43.2627417), (-27.25, 44.2))
            make_face(mode=Mode.SUBTRACT)
        extrude(amount=EXTRUDE_19_DEPTH, both=True)

    # 草图26 → 切除-拉伸5 (cut)
    with SkipClean():  # the faces are left unmerged after this step: merging them gives an invalid solid
        with BuildSketch(Plane.XY):
            with Locations((0, -208)):
                Circle(SKETCH_26_R)
            with Locations((0, -235)):
                Circle(SKETCH_26_R)
        extrude(amount=-CUT_EXTRUDE_5_DEPTH, mode=Mode.SUBTRACT)

    # 草图28 → 切除-拉伸6 (cut, through all)
    with SkipClean():  # the faces are left unmerged after this step: merging them gives an invalid solid
        with BuildSketch(Plane.XY):
            with Locations((0, -194.5)):
                Circle(SKETCH_28_R)
        cut_extrude_6 = extrude(amount=-CUT_EXTRUDE_6_DEPTH, mode=Mode.SUBTRACT)

    # 阵列(线性)1: 切除-拉伸6 ×10
    with SkipClean():  # the faces are left unmerged after this step: merging them gives an invalid solid
        with Locations(*[(0, i * PATTERN_LINEAR_1_PITCH, 0) for i in range(1, PATTERN_LINEAR_1_COUNT)]):
            add(cut_extrude_6, mode=Mode.SUBTRACT)

    # 草图30 → 切除-拉伸7 (cut, through all)
    with SkipClean():  # the faces are left unmerged after this step: merging them gives an invalid solid
        with BuildSketch(Plane.XY):
            with BuildLine():
                Line((-16.246237796, -68.360481704), (-16.246237796, -140.360481704))
                ThreePointArc((-16.246237796, -140.360481704), (-20.746237796, -144.860481704), (-25.246237796, -140.360481704))
                Line((-25.246237796, -140.360481704), (-25.246237796, -68.360481704))
                ThreePointArc((-25.246237796, -68.360481704), (-20.746237796, -63.860481704), (-16.246237796, -68.360481704))
            make_face()
            with BuildLine():
                Line((16.246237796, -68.360481704), (16.246237796, -140.360481704))
                ThreePointArc((16.246237796, -140.360481704), (20.746237796, -144.860481704), (25.246237796, -140.360481704))
                Line((25.246237796, -140.360481704), (25.246237796, -68.360481704))
                ThreePointArc((25.246237796, -68.360481704), (20.746237796, -63.860481704), (16.246237796, -68.360481704))
            make_face()
        extrude(amount=-CUT_EXTRUDE_7_DEPTH, mode=Mode.SUBTRACT)

    # 草图33 → 切除-拉伸8 (cut, through all)
    with SkipClean():  # the faces are left unmerged after this step: merging them gives an invalid solid
        with BuildSketch(Plane.XY):
            with Locations((0, -221.5)):
                Circle(SKETCH_33_R)
        extrude(amount=-CUT_EXTRUDE_8_DEPTH, mode=Mode.SUBTRACT)

    # 凸台-拉伸20: up to this plane
    with SkipClean():  # the faces are left unmerged after this step: merging them gives an invalid solid
        extrude_20_end = Plane(origin=(-25.627068489, -129.238012986, 14.649682297), z_dir=(0.8681607792697689, 0, -0.4962830455876039))
        # 草图34 → 凸台-拉伸20 (add, up to the surface)
        with BuildSketch(Plane.XY.offset(7), mode=Mode.PRIVATE) as extrude_20_sk1:
            with Locations((-36, 20)):
                Circle(SKETCH_34_R)
            with Locations((-36, 20)):
                Circle(SKETCH_34_R_2, mode=Mode.SUBTRACT)
        extrude_20_tool1 = split(extrude(extrude_20_sk1.sketch, amount=-EXTRUDE_20_REACH, mode=Mode.PRIVATE), bisect_by=extrude_20_end, keep=Keep.BOTH, mode=Mode.PRIVATE)
        add(extrude_20_tool1.solids().sort_by_distance((-39.816885, 20, 7))[0])
        # 草图34 → 凸台-拉伸20 (add, up to the surface)
        with BuildSketch(Plane.XY.offset(7), mode=Mode.PRIVATE) as extrude_20_sk2:
            with Locations((-36, -20)):
                Circle(SKETCH_34_R)
            with Locations((-36, -20)):
                Circle(SKETCH_34_R_2, mode=Mode.SUBTRACT)
        extrude_20_tool2 = split(extrude(extrude_20_sk2.sketch, amount=-EXTRUDE_20_REACH, mode=Mode.PRIVATE), bisect_by=extrude_20_end, keep=Keep.BOTH, mode=Mode.PRIVATE)
        add(extrude_20_tool2.solids().sort_by_distance((-39.816885, -20, 7))[0])

    # 凸台-拉伸21: up to this plane
    with SkipClean():  # the faces are left unmerged after this step: merging them gives an invalid solid
        extrude_21_end = Plane(origin=(25.627068489, -129.238012986, 14.649682297), z_dir=(0.8681607792697689, 0, 0.4962830455876039))
        # 草图36 → 凸台-拉伸21 (add, up to the surface)
        with BuildSketch(Plane.XY.offset(7), mode=Mode.PRIVATE) as extrude_21_sk1:
            with Locations((36, -20)):
                Circle(SKETCH_36_R)
            with Locations((36, -20)):
                Circle(SKETCH_36_R_2, mode=Mode.SUBTRACT)
        extrude_21_tool1 = split(extrude(extrude_21_sk1.sketch, amount=-EXTRUDE_21_REACH, mode=Mode.PRIVATE), bisect_by=extrude_21_end, keep=Keep.BOTH, mode=Mode.PRIVATE)
        add(extrude_21_tool1.solids().sort_by_distance((32.183115, -20, 7))[0])
        # 草图36 → 凸台-拉伸21 (add, up to the surface)
        with BuildSketch(Plane.XY.offset(7), mode=Mode.PRIVATE) as extrude_21_sk2:
            with Locations((36, 20)):
                Circle(SKETCH_36_R)
            with Locations((36, 20)):
                Circle(SKETCH_36_R_2, mode=Mode.SUBTRACT)
        extrude_21_tool2 = split(extrude(extrude_21_sk2.sketch, amount=-EXTRUDE_21_REACH, mode=Mode.PRIVATE), bisect_by=extrude_21_end, keep=Keep.BOTH, mode=Mode.PRIVATE)
        add(extrude_21_tool2.solids().sort_by_distance((32.183115, 20, 7))[0])


solid = part_1.part
